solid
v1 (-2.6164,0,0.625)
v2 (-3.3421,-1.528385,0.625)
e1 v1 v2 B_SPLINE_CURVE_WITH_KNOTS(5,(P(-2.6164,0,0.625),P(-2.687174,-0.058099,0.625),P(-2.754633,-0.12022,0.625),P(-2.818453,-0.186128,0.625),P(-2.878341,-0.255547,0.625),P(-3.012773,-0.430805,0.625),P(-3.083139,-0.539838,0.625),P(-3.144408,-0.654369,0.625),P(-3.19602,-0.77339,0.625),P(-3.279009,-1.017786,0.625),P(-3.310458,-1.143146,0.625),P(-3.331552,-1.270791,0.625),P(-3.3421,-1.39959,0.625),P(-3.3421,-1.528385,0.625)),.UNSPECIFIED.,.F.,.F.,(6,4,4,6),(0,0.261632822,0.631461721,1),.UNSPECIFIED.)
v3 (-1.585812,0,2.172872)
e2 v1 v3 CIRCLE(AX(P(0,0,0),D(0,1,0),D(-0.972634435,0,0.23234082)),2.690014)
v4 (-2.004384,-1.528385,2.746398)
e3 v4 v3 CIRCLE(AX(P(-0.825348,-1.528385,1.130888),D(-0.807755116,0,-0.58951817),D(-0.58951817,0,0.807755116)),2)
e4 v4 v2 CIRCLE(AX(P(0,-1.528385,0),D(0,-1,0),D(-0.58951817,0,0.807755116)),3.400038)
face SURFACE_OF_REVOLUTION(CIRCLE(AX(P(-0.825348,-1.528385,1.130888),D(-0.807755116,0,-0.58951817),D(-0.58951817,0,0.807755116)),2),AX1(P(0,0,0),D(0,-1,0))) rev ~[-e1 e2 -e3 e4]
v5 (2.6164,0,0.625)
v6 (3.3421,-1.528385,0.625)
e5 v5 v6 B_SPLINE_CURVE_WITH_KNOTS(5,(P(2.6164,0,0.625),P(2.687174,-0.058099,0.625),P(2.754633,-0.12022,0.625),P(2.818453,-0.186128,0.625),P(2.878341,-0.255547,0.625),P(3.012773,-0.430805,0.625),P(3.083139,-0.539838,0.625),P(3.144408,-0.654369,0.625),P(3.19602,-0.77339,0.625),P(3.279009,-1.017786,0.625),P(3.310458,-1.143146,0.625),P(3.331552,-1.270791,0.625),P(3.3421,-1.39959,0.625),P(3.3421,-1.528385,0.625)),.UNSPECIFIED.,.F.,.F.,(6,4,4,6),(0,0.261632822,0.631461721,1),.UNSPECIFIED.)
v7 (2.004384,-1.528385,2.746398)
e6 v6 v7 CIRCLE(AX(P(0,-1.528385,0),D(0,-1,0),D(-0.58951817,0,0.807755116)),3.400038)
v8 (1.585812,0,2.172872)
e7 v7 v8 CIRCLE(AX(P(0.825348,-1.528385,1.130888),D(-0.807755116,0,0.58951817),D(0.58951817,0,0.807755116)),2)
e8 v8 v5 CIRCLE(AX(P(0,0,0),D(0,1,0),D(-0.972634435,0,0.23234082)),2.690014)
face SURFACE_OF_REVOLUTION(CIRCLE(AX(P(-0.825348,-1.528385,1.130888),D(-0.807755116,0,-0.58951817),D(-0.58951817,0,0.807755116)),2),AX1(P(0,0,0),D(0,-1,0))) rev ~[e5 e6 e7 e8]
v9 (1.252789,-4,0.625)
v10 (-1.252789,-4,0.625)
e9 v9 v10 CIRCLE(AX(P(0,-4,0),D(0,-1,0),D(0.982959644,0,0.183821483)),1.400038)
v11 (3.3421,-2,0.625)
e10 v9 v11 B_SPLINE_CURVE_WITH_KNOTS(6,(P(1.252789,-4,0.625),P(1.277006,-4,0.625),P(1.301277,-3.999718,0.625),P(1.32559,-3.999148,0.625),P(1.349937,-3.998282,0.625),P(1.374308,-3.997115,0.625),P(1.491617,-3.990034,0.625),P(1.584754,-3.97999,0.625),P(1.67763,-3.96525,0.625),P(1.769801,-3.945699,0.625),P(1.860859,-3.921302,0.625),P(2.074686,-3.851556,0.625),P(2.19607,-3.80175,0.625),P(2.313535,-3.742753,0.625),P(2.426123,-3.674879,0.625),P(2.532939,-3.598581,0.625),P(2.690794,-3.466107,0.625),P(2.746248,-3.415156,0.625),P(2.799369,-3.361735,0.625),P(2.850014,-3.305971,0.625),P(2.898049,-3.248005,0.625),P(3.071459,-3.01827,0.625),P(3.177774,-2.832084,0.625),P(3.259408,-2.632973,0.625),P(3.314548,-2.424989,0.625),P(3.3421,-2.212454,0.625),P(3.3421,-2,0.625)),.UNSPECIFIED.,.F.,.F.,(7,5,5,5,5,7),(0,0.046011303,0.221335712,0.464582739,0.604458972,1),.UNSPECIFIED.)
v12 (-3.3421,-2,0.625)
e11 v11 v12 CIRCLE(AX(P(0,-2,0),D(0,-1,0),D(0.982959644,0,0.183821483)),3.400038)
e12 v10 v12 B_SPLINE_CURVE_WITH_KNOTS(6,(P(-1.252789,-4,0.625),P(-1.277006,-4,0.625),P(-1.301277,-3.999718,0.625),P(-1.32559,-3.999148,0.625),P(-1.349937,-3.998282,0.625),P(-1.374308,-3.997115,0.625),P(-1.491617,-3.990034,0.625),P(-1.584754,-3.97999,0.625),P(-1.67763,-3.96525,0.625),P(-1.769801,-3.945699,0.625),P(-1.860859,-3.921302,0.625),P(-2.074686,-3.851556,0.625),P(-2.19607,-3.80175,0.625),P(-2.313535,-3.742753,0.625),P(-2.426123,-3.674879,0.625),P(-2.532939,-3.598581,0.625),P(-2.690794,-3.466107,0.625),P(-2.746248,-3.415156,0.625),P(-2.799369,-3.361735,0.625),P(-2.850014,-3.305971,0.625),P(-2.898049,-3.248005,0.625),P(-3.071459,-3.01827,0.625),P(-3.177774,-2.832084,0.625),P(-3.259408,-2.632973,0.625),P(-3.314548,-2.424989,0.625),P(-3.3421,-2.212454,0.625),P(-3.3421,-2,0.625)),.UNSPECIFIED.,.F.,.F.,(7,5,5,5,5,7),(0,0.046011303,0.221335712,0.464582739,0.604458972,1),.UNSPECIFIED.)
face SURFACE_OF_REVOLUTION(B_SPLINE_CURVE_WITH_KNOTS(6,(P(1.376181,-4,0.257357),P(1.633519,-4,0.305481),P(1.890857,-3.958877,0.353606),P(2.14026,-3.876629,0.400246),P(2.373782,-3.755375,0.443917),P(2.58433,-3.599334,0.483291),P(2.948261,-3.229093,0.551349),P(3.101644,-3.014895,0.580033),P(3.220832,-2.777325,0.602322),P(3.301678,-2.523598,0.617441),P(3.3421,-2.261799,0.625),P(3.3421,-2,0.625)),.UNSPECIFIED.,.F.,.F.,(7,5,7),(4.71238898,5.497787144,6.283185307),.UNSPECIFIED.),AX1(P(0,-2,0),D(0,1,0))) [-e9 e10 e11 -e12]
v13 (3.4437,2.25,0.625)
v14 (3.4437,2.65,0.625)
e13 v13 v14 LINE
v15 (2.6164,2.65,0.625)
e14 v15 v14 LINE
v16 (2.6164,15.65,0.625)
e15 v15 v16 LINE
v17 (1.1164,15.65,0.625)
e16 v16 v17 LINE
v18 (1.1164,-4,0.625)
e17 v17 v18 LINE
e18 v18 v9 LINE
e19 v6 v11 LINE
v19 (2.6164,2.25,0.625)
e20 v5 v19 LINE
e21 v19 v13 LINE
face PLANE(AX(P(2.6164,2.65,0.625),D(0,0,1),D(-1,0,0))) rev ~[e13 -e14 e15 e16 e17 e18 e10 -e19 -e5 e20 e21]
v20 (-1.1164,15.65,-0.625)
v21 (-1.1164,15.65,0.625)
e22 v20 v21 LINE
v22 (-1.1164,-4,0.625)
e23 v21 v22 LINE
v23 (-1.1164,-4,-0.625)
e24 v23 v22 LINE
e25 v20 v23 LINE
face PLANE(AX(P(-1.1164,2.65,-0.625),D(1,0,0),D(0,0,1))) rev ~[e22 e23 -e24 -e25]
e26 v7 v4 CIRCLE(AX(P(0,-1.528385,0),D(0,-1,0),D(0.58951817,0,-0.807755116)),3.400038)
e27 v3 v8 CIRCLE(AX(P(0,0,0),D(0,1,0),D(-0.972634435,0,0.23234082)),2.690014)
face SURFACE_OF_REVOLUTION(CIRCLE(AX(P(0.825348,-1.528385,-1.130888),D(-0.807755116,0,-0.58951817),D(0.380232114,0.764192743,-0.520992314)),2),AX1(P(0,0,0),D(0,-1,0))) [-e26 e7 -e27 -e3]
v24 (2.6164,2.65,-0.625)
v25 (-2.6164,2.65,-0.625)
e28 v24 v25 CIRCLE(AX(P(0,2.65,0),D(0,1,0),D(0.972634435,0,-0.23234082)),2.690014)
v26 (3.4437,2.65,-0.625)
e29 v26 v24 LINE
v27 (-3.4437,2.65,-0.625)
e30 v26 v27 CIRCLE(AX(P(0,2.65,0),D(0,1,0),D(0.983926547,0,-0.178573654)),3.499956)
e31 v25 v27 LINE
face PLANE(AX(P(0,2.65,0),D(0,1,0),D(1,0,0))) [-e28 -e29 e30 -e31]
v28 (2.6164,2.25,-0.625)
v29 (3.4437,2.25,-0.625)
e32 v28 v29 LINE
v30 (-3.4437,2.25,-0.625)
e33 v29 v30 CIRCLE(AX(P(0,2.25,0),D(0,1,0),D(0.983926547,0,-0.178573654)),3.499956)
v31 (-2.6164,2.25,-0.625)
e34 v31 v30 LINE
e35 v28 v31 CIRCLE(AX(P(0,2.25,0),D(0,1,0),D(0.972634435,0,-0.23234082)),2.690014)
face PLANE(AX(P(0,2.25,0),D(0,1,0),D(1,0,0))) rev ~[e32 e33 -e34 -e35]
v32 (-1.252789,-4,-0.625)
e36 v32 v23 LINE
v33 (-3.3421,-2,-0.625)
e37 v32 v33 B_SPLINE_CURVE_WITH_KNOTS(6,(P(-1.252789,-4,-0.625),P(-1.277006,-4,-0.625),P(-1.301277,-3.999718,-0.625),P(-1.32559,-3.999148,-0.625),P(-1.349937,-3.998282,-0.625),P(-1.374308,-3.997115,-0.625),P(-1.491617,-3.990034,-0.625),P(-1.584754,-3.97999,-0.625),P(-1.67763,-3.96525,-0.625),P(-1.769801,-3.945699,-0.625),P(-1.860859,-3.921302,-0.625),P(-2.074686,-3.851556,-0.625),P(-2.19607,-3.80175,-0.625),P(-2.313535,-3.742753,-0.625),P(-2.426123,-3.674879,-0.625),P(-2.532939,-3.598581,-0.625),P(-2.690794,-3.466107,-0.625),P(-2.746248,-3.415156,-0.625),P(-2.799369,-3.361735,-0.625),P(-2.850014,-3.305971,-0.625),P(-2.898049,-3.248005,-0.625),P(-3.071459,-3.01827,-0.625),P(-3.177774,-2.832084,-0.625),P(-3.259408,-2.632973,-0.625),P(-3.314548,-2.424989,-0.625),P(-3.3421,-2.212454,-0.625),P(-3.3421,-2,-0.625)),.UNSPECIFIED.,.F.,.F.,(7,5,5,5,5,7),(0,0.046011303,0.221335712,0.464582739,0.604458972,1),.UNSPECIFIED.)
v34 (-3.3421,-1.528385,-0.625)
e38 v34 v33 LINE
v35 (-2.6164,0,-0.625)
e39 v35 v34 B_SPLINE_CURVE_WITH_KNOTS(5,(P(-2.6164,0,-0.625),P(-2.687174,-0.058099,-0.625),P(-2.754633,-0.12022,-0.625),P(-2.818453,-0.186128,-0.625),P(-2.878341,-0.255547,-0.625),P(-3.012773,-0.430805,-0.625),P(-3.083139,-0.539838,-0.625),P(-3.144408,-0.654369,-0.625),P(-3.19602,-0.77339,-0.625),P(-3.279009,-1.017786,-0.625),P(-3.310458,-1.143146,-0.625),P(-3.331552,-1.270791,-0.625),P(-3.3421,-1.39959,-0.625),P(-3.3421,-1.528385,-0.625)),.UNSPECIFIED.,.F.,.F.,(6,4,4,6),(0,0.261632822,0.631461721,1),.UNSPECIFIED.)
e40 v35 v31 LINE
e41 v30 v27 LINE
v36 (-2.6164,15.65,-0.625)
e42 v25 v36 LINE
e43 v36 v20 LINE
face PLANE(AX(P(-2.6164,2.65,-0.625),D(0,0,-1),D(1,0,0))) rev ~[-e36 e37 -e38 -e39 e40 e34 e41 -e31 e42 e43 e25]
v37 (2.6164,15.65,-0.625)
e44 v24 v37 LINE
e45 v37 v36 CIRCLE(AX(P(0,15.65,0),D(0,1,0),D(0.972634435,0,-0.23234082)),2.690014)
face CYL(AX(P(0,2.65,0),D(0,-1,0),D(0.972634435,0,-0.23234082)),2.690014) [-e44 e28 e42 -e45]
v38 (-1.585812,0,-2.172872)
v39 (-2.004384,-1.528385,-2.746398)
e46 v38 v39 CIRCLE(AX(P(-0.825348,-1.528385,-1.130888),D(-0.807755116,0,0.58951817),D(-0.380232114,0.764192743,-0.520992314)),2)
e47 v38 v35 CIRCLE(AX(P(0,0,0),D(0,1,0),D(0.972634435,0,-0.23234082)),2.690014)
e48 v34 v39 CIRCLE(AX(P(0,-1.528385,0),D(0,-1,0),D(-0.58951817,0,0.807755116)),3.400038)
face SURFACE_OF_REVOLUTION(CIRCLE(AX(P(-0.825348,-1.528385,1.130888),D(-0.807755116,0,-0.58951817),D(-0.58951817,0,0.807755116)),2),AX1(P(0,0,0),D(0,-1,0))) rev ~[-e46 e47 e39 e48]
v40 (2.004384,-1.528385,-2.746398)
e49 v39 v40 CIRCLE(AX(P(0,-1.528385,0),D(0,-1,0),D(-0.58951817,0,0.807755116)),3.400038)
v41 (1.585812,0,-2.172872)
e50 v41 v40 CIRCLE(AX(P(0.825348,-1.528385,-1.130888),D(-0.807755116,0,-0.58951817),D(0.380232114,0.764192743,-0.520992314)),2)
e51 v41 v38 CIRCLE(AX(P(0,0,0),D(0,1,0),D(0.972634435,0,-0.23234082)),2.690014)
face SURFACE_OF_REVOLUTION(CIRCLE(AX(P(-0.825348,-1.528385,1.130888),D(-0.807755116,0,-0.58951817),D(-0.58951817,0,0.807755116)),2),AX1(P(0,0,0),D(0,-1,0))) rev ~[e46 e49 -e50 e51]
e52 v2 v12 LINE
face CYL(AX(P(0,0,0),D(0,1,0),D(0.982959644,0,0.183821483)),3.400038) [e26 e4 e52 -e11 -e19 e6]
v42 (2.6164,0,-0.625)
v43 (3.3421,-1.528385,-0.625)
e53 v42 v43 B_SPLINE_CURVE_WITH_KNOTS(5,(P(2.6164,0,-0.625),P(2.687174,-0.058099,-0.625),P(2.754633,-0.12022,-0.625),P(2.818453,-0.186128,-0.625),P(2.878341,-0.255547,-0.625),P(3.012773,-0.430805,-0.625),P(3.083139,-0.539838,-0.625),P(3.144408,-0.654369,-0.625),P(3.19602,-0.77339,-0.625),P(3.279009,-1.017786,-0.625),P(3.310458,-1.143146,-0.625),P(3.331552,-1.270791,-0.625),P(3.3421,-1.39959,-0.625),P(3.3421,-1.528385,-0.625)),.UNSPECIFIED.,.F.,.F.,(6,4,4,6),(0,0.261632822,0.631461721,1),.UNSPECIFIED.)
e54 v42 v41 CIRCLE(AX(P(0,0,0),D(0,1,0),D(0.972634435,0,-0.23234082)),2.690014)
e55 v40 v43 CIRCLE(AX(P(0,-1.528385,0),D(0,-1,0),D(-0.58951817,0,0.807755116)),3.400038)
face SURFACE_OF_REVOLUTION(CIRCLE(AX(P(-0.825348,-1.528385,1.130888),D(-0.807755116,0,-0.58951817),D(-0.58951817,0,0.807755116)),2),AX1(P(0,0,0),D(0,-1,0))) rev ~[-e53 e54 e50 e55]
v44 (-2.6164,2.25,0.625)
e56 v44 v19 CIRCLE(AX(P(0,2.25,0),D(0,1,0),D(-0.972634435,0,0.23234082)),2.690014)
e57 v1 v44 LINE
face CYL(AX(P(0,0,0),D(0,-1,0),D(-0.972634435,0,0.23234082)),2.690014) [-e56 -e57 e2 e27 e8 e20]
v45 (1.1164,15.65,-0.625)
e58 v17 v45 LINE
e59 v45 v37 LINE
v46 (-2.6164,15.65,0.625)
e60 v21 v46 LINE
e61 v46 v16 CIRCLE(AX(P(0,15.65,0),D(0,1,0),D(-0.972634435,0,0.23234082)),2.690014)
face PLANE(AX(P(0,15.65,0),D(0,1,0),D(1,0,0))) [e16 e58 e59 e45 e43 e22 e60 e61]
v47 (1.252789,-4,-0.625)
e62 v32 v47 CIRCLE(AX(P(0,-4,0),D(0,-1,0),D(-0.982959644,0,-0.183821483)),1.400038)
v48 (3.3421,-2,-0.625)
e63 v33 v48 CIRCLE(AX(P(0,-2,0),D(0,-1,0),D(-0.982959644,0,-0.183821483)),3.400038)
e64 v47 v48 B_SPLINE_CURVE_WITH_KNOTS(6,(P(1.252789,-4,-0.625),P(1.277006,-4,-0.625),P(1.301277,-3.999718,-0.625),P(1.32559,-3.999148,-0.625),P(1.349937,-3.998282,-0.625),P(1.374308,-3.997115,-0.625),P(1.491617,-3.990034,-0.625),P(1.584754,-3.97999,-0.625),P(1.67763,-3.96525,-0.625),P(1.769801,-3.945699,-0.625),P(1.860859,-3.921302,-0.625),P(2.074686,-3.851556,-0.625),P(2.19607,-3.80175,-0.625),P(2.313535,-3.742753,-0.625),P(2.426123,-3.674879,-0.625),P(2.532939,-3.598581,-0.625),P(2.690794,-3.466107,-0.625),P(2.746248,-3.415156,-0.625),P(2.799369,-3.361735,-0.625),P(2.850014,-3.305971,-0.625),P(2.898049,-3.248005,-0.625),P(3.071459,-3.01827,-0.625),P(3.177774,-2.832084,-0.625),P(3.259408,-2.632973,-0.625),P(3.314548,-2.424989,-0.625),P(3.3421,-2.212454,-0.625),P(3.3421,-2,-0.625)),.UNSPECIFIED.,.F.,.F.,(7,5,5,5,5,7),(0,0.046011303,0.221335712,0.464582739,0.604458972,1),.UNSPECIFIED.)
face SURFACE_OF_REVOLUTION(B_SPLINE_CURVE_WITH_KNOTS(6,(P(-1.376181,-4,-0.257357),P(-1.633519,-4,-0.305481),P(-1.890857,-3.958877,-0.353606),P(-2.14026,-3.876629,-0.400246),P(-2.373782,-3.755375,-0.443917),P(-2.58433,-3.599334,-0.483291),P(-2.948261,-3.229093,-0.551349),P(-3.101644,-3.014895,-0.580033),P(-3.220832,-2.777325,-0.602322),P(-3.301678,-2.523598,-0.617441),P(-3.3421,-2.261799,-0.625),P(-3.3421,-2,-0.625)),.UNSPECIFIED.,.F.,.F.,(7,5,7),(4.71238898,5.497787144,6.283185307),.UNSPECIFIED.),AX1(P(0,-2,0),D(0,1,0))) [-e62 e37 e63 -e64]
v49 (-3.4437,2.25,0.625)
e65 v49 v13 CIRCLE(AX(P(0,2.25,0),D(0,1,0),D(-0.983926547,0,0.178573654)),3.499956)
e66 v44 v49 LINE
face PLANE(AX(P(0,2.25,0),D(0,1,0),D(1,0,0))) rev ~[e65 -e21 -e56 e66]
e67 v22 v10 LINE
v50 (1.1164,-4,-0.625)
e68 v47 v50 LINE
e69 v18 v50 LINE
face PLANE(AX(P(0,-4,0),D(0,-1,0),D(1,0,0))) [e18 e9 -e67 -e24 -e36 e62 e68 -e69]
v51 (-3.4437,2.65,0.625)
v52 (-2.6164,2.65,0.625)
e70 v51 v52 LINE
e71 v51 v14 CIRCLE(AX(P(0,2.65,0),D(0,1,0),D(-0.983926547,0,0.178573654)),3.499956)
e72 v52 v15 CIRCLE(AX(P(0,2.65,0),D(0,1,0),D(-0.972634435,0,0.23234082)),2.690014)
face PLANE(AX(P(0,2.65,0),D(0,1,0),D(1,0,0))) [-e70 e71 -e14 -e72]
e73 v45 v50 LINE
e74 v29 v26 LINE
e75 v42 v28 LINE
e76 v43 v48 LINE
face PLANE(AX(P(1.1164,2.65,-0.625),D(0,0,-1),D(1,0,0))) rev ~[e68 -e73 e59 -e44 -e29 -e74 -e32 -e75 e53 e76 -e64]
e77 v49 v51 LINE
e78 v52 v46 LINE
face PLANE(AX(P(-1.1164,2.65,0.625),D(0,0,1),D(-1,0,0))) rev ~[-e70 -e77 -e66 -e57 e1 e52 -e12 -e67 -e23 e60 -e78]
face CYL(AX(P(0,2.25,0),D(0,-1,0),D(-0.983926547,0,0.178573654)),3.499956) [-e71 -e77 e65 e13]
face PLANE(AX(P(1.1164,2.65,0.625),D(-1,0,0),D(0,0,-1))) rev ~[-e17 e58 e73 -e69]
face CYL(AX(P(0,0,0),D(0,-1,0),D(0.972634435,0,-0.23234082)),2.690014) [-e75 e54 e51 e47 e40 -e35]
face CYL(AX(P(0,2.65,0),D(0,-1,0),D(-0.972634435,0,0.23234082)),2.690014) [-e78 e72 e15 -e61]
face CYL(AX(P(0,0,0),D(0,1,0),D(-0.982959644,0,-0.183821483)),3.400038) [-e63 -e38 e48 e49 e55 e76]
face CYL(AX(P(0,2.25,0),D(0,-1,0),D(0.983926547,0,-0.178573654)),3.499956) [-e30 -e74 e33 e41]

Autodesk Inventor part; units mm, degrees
ref_plane "YZ Plane" through (0, 0, 0) normal (1, 0, 0) x (0, 1, 0)
ref_plane "XZ Plane" through (0, 0, 0) normal (0, 1, 0) x (-1, 0, 0)
ref_plane "XY Plane" through (0, 0, 0) normal (0, 0, 1) x (1, 0, 0)
sketch "Sketch1" plane through (0, 0, 0) normal (0, 1, 0) x (-1, 0, 0)
  line L0 (2.6164, 0.625) -> (1.1164, 0.625)
  line L1 (1.1164, 0.625) -> (1.1164, -0.625)
  line L2 (1.1164, -0.625) -> (2.6164, -0.625)
  line L3 (-2.6164, 0.625) -> (-1.1164, 0.625)
  line L4 (-1.1164, 0.625) -> (-1.1164, -0.625)
  line L5 (-1.1164, -0.625) -> (-2.6164, -0.625)
  line L6 (1.1164, 0) -> (-1.1164, 0) construction
  arc A0 (2.6164, 0.625) -> (-2.6164, 0.625) centre (0, 0) ccw
  arc A1 (-2.6164, -0.625) -> (2.6164, -0.625) centre (0, 0) ccw
  dimension "d1" = 2.69
  dimension "d2" = 2.69
  dimension "d3" = 1.5
  dimension "d4" = 1.25
extrude "Extrusion1" add sketch "Sketch1" along normal blind 2.25
sketch "Sketch2" plane through (0, 2.25, 0) normal (0, 1, 0) x (1, 0, 0)
  line L0 (-1.1164, 0.625) -> (-1.1164, -0.625) projected
  line L1 (-1.1164, -0.625) -> (-2.6164, -0.625) projected
  arc A0 (-2.6164, -0.625) -> (2.6164, -0.625) centre (0, 0) ccw construction
  line L2 (2.6164, -0.625) -> (1.1164, -0.625) projected
  line L3 (1.1164, -0.625) -> (1.1164, 0.625) projected
  line L4 (1.1164, 0.625) -> (2.6164, 0.625) projected
  arc A1 (2.6164, 0.625) -> (-2.6164, 0.625) centre (0, 0) ccw construction
  line L5 (-2.6164, 0.625) -> (-1.1164, 0.625) projected
  arc A2 (-3.4437, -0.625) -> (3.4437, -0.625) centre (0, 0) ccw
  arc A3 (3.4437, 0.625) -> (-3.4437, 0.625) centre (0, 0) ccw
  line L6 (-2.6164, -0.625) -> (-3.4437, -0.625)
  arc A4 (2.6164, 0.625) -> (-2.6164, 0.625) centre (0, 0) ccw construction
  line L7 (-2.6164, 0.625) -> (-3.4437, 0.625)
  line L8 (2.6164, 0.625) -> (3.4437, 0.625)
  line L9 (2.6164, -0.625) -> (3.4437, -0.625)
  dimension "d7" = 3.5
  dimension "d8" = 3.5
extrude "Extrusion2" add sketch "Sketch2" along normal blind 0.4
sketch "Sketch3" plane through (0, 2.65, 0) normal (0, 1, 0) x (1, 0, 0)
  arc A0 (-2.6164, -0.625) -> (2.6164, -0.625) centre (0, 0) ccw projected
  arc A1 (2.6164, 0.625) -> (-2.6164, 0.625) centre (0, 0) ccw projected
  line L0 (-3.4437, 0.625) -> (-1.1164, 0.625) projected
  line L1 (-1.1164, 0.625) -> (-1.1164, -0.625) projected
  line L2 (-1.1164, -0.625) -> (-3.4437, -0.625) projected
  line L3 (3.4437, -0.625) -> (1.1164, -0.625) projected
  line L4 (1.1164, -0.625) -> (1.1164, 0.625) projected
  line L5 (1.1164, 0.625) -> (3.4437, 0.625) projected
extrude "Extrusion3" add sketch "Sketch3" along normal blind 13
sketch "Sketch4" plane through (0, 0, 0) normal (0, -1, 0) x (1, 0, 0)
  line L0 (-1.1164, -0.625) -> (-1.1164, 0.625) projected
  line L1 (-2.6164, -0.625) -> (-1.1164, -0.625) projected
  arc A0 (-2.6164, -0.625) -> (2.6164, -0.625) centre (0, 0) ccw construction
  line L2 (1.1164, -0.625) -> (2.6164, -0.625) projected
  line L3 (1.1164, 0.625) -> (1.1164, -0.625) projected
  line L4 (2.6164, 0.625) -> (1.1164, 0.625) projected
  arc A1 (2.6164, 0.625) -> (-2.6164, 0.625) centre (0, 0) ccw construction
  line L5 (-1.1164, 0.625) -> (-2.6164, 0.625) projected
  arc A2 (3.3421, 0.625) -> (-3.3421, 0.625) centre (0, 0) ccw
  arc A3 (-3.3421, -0.625) -> (3.3421, -0.625) centre (0, 0) ccw
  line L6 (2.6164, 0.625) -> (3.3421, 0.625)
  line L7 (3.4437, 0.625) -> (2.6164, 0.625) projected
  arc A4 (-2.6164, -0.625) -> (2.6164, -0.625) centre (0, 0) ccw projected
  line L8 (2.6164, -0.625) -> (3.4437, -0.625) projected
  line L9 (-2.6164, -0.625) -> (-3.3421, -0.625)
  line L10 (-3.4437, -0.625) -> (-2.6164, -0.625) projected
  line L11 (-2.6164, 0.625) -> (-3.3421, 0.625)
  line L12 (-2.6164, 0.625) -> (-3.4437, 0.625) projected
  dimension "d13" = 3.4
  dimension "d14" = 3.4
extrude "Extrusion4" add sketch "Sketch4" along normal blind 4
fillet "Fillet1" radius 2 2 edges at (0, 0, -3.4) (0, 0, 3.4)
fillet "Fillet2" radius 2 2 edges at (0, -4, -3.4) (0, -4, 3.4)
equation "\"d2\" = d1"
equation "\"d8\" = d7"
equation "\"d14\" = d13"
properties part number "Toggle_Level" material "PC/ABS Plastic"
